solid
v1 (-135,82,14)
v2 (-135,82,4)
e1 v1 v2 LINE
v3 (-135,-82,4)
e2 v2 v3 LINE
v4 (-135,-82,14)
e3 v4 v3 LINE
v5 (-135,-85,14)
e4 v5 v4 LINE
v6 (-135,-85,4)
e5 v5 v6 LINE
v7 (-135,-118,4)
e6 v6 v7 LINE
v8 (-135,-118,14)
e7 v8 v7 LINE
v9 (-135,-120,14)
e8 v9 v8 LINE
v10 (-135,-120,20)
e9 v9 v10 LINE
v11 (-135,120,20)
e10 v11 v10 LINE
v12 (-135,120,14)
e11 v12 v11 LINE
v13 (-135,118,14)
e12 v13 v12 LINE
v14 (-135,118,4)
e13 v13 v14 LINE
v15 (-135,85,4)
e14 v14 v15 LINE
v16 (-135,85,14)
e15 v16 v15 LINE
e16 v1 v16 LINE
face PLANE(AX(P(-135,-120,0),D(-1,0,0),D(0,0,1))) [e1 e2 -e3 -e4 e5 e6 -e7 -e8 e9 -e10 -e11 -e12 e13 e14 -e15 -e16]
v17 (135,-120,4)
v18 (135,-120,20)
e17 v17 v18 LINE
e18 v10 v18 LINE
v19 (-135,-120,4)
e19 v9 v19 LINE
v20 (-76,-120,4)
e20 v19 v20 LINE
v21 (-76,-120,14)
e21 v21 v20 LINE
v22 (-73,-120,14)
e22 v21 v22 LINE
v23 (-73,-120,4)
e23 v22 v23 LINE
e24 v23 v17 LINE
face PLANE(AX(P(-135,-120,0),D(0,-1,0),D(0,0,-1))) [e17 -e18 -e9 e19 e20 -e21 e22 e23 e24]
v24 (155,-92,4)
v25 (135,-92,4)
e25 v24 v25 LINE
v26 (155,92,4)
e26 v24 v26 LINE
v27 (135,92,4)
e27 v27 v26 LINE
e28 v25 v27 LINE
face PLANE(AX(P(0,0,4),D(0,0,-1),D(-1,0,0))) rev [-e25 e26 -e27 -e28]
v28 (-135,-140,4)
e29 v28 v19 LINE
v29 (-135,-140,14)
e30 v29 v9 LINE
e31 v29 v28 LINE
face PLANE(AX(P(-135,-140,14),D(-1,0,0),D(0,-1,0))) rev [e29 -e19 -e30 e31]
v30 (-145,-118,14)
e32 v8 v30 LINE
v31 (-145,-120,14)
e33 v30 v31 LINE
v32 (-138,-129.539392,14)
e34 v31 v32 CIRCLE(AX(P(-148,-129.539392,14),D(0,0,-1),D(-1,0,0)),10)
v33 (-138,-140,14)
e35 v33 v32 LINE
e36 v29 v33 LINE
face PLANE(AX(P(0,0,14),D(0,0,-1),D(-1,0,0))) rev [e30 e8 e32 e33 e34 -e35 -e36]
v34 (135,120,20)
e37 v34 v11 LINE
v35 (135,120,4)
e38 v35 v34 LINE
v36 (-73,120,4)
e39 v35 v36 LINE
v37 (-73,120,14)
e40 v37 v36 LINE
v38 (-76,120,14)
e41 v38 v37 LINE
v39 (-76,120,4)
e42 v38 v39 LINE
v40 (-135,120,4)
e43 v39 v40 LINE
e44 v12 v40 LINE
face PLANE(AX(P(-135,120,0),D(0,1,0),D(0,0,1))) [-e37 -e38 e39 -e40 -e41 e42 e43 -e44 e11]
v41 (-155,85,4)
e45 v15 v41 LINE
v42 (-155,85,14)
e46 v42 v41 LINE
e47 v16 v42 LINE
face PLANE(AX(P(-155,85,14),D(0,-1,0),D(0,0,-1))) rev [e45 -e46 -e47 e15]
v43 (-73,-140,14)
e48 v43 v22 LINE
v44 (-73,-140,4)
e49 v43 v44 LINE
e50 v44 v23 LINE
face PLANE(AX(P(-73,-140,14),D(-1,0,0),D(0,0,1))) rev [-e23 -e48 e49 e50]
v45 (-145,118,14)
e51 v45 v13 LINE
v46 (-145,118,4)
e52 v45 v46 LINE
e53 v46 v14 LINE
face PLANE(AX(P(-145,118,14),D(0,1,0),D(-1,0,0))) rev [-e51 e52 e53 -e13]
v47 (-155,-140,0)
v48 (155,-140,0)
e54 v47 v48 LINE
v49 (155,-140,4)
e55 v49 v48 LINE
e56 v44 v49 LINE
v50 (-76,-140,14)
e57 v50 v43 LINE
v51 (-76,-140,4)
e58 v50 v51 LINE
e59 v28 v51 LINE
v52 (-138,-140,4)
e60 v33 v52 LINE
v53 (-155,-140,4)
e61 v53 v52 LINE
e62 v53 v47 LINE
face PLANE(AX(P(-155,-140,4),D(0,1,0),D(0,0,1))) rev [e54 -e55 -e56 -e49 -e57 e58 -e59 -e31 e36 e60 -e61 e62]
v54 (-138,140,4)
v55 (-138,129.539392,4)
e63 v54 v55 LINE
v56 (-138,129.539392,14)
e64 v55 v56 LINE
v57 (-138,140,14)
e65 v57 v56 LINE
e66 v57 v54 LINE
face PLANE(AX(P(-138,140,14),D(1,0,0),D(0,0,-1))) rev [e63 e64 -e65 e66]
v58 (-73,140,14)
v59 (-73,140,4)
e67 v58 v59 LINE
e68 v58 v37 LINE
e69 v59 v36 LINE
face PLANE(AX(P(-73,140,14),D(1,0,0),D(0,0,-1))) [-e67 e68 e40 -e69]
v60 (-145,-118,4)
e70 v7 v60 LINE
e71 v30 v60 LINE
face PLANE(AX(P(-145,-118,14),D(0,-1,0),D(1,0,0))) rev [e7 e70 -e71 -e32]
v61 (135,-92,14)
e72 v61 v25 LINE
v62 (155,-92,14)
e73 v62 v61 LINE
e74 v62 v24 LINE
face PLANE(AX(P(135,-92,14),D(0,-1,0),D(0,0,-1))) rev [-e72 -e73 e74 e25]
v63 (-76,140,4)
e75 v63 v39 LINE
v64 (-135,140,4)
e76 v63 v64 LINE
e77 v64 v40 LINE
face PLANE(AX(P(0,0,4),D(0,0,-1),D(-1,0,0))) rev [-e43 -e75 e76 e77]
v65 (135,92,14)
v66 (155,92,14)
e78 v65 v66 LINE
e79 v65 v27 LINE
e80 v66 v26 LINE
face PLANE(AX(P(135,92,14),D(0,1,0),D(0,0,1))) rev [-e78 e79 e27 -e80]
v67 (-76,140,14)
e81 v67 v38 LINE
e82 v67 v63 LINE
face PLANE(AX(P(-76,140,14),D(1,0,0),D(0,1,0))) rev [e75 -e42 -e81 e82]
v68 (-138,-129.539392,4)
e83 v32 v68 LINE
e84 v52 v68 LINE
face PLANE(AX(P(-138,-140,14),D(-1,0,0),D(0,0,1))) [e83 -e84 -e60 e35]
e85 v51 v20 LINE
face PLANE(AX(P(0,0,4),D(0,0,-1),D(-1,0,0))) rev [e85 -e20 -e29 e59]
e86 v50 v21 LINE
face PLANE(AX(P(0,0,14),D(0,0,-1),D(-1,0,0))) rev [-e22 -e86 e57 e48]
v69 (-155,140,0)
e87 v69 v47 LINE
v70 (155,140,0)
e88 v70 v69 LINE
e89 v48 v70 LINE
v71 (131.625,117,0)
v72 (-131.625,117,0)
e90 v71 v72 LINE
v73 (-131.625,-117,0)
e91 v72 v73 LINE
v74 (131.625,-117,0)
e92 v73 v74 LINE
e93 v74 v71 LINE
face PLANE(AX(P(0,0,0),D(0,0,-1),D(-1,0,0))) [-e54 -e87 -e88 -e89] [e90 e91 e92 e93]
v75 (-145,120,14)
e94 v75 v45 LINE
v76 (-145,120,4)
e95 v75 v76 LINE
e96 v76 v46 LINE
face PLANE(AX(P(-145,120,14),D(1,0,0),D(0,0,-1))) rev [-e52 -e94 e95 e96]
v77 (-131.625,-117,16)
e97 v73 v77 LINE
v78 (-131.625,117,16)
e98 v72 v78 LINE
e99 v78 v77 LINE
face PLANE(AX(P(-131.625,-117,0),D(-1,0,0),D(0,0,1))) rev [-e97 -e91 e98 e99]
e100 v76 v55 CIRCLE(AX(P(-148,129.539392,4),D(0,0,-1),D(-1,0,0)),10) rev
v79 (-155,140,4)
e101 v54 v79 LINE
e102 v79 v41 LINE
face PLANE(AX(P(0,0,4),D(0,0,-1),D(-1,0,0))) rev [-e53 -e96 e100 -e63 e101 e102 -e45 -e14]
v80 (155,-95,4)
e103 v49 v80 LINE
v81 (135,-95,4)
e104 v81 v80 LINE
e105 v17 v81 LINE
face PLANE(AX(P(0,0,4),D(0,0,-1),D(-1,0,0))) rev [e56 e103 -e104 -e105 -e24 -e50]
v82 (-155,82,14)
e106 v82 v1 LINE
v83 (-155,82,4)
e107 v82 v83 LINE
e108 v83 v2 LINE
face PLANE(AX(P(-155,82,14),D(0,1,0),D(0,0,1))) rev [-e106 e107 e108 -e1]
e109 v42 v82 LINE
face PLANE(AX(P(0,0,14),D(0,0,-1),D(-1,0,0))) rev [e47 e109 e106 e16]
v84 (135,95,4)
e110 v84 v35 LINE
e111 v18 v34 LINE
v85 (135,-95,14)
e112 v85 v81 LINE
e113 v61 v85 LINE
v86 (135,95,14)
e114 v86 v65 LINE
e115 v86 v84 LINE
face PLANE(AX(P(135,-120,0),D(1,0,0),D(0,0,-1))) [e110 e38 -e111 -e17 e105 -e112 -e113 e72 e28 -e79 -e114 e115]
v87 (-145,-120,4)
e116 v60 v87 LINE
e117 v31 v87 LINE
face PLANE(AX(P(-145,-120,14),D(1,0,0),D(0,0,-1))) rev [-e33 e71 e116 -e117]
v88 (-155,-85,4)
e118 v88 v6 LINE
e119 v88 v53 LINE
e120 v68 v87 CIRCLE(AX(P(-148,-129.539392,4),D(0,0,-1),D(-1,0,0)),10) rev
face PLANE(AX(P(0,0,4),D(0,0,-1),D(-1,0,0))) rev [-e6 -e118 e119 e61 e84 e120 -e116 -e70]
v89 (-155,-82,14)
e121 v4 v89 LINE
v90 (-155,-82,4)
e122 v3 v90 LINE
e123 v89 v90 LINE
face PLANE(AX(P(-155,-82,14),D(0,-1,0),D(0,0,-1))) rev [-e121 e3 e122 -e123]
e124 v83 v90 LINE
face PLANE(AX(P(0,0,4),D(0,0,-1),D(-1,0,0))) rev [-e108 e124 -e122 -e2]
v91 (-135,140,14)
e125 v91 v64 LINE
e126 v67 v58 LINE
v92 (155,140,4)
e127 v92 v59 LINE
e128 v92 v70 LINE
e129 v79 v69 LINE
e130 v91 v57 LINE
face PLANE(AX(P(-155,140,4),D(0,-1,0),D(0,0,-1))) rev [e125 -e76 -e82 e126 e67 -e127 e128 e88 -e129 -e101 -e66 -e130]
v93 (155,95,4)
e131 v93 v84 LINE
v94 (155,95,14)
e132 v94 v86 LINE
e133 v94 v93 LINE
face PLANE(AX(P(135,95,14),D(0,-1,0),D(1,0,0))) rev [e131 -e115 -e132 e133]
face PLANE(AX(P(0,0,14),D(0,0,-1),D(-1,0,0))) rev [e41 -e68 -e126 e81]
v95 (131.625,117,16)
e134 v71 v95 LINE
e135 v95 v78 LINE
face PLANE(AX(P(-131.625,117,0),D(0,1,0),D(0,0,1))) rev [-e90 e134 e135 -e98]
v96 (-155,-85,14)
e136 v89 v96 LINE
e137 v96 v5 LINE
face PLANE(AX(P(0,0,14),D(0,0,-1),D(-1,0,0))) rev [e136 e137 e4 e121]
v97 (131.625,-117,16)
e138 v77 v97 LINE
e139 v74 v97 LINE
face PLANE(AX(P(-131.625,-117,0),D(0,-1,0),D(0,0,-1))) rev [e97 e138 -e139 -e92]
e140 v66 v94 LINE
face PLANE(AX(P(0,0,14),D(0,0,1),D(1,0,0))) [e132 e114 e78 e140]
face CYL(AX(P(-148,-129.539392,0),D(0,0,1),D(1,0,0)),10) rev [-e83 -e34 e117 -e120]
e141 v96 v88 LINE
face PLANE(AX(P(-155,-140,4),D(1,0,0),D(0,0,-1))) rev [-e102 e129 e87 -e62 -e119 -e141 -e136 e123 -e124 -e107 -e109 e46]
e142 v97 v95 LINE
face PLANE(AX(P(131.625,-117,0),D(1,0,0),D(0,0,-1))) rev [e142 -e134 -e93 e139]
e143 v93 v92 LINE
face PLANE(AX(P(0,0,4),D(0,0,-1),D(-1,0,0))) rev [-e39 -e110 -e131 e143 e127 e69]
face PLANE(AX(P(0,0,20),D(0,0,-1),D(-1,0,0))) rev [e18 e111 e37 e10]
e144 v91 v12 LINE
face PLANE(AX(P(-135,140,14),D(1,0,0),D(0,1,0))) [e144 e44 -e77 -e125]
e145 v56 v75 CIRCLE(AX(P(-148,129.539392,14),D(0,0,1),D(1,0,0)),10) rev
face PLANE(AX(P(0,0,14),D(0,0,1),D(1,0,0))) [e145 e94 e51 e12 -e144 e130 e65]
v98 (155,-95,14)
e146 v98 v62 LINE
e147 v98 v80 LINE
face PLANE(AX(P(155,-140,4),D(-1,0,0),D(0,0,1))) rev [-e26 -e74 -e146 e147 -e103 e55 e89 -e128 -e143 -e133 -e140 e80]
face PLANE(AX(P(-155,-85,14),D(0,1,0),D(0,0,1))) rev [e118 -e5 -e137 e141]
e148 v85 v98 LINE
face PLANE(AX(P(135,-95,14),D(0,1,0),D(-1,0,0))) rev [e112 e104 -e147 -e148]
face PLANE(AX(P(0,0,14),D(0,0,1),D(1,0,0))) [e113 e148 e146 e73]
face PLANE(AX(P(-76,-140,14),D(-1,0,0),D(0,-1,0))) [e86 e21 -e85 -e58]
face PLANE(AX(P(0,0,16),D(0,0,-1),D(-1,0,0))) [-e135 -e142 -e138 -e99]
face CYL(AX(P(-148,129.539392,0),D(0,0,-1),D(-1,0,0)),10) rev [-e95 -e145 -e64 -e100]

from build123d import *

# Parameters (mm, degrees)
SKETCH1_W                = 310
SKETCH1_H                = 280
SKETCH1_W_2              = 270
SKETCH1_H_2              = 240
BOSS_EXTRUDE1_DEPTH      = 4
BOSS_EXTRUDE3_DEPTH      = 16
BOSS_EXTRUDE3_DEPTH_BACK = 4
SKETCH2_W                = 270
SKETCH2_H                = 240
SKETCH2_W_2              = 263.25
SKETCH2_H_2              = 234
SKETCH4_W                = 263.25
SKETCH4_H                = 234
BOSS_EXTRUDE4_DEPTH      = 4
SKETCH6_W                = 20
SKETCH6_H                = 3
SKETCH6_W_2              = 10
SKETCH6_H_2              = 2
BOSS_EXTRUDE5_DEPTH      = 10
SKETCH7_W                = 3
SKETCH7_H                = 20
BOSS_EXTRUDE6_DEPTH      = 10
FILLET1_R                = 10


with BuildPart() as part:
    # Sketch1 → Boss-Extrude1 (new body)
    with BuildSketch(Plane.XY):
        Rectangle(SKETCH1_W, SKETCH1_H)
        Rectangle(SKETCH1_W_2, SKETCH1_H_2, mode=Mode.SUBTRACT)
    extrude(amount=BOSS_EXTRUDE1_DEPTH)

    # Sketch2 → Boss-Extrude3 (add, two sides: drawn at the far end of the back side and taken through both)
    with BuildSketch(Plane.XY.offset(4).offset(-BOSS_EXTRUDE3_DEPTH_BACK)):
        Rectangle(SKETCH2_W, SKETCH2_H)
        Rectangle(SKETCH2_W_2, SKETCH2_H_2, mode=Mode.SUBTRACT)
    extrude(amount=BOSS_EXTRUDE3_DEPTH + BOSS_EXTRUDE3_DEPTH_BACK)

    # Sketch4 → Boss-Extrude4 (add)
    with BuildSketch(Plane.XY.offset(20)):
        Rectangle(SKETCH4_W, SKETCH4_H)
    extrude(amount=-BOSS_EXTRUDE4_DEPTH)

    # Sketch6 → Boss-Extrude5 (add)
    with BuildSketch(Plane.XY.offset(4)):
        with Locations((-145, 83.5)):
            Rectangle(SKETCH6_W, SKETCH6_H)
        with Locations((145, 93.5)):
            Rectangle(SKETCH6_W, SKETCH6_H)
        with Locations((145, -93.5)):
            Rectangle(SKETCH6_W, SKETCH6_H)
        with Locations((-145, -83.5)):
            Rectangle(SKETCH6_W, SKETCH6_H)
        with Locations((-140, -119)):
            Rectangle(SKETCH6_W_2, SKETCH6_H_2)
        with Locations((-140, 119)):
            Rectangle(SKETCH6_W_2, SKETCH6_H_2)
    extrude(amount=BOSS_EXTRUDE5_DEPTH)

    # Sketch7 → Boss-Extrude6 (add)
    with BuildSketch(Plane.XY.offset(4)):
        with Locations((-136.5, 130)):
            Rectangle(SKETCH7_W, SKETCH7_H)
        with Locations((-74.5, 130)):
            Rectangle(SKETCH7_W, SKETCH7_H)
        with Locations((-136.5, -130)):
            Rectangle(SKETCH7_W, SKETCH7_H)
        with Locations((-74.5, -130)):
            Rectangle(SKETCH7_W, SKETCH7_H)
    extrude(amount=BOSS_EXTRUDE6_DEPTH)

    # Fillet1
    # the kernel refuses this fillet: 10 mm, written as the material it adds along each edge
    with BuildSketch(Plane(origin=(-138, -120, 4), x_dir=(-1, 0, 0), z_dir=(0, 0, 1))) as fillet1_piece_1:
        with BuildLine():
            CenterArc((10, 9.539392014), FILLET1_R, 180, 72.542396876)
            Line((0, 9.539392014), (-0.2, 9.539392014))
            Line((-0.2, 9.539392014), (-0.2, 0))
            Line((-0.2, 0), (0, -0.2))
            ThreePointArc((0, -0.2), (3.5, -0.2), (6.94, -0.19078784))
            Line((6.94, -0.19078784), (7, 0))
        make_face()
    extrude(amount=10)
    with BuildSketch(Plane(origin=(-138, 120, 4), x_dir=(0, 1, 0), z_dir=(0, 0, 1))) as fillet1_piece_2:
        with BuildLine():
            CenterArc((9.539392014, 10), FILLET1_R, 197.457603124, 72.542396876)
            Line((0, 7), (-0.19078784, 6.94))
            ThreePointArc((-0.19078784, 6.94), (-0.2, 3.5), (-0.2, 0))
            Line((-0.2, 0), (0, -0.2))
            Line((0, -0.2), (9.539392014, -0.2))
            Line((9.539392014, -0.2), (9.539392014, 0))
        make_face()
    extrude(amount=10)


solid = part.part
